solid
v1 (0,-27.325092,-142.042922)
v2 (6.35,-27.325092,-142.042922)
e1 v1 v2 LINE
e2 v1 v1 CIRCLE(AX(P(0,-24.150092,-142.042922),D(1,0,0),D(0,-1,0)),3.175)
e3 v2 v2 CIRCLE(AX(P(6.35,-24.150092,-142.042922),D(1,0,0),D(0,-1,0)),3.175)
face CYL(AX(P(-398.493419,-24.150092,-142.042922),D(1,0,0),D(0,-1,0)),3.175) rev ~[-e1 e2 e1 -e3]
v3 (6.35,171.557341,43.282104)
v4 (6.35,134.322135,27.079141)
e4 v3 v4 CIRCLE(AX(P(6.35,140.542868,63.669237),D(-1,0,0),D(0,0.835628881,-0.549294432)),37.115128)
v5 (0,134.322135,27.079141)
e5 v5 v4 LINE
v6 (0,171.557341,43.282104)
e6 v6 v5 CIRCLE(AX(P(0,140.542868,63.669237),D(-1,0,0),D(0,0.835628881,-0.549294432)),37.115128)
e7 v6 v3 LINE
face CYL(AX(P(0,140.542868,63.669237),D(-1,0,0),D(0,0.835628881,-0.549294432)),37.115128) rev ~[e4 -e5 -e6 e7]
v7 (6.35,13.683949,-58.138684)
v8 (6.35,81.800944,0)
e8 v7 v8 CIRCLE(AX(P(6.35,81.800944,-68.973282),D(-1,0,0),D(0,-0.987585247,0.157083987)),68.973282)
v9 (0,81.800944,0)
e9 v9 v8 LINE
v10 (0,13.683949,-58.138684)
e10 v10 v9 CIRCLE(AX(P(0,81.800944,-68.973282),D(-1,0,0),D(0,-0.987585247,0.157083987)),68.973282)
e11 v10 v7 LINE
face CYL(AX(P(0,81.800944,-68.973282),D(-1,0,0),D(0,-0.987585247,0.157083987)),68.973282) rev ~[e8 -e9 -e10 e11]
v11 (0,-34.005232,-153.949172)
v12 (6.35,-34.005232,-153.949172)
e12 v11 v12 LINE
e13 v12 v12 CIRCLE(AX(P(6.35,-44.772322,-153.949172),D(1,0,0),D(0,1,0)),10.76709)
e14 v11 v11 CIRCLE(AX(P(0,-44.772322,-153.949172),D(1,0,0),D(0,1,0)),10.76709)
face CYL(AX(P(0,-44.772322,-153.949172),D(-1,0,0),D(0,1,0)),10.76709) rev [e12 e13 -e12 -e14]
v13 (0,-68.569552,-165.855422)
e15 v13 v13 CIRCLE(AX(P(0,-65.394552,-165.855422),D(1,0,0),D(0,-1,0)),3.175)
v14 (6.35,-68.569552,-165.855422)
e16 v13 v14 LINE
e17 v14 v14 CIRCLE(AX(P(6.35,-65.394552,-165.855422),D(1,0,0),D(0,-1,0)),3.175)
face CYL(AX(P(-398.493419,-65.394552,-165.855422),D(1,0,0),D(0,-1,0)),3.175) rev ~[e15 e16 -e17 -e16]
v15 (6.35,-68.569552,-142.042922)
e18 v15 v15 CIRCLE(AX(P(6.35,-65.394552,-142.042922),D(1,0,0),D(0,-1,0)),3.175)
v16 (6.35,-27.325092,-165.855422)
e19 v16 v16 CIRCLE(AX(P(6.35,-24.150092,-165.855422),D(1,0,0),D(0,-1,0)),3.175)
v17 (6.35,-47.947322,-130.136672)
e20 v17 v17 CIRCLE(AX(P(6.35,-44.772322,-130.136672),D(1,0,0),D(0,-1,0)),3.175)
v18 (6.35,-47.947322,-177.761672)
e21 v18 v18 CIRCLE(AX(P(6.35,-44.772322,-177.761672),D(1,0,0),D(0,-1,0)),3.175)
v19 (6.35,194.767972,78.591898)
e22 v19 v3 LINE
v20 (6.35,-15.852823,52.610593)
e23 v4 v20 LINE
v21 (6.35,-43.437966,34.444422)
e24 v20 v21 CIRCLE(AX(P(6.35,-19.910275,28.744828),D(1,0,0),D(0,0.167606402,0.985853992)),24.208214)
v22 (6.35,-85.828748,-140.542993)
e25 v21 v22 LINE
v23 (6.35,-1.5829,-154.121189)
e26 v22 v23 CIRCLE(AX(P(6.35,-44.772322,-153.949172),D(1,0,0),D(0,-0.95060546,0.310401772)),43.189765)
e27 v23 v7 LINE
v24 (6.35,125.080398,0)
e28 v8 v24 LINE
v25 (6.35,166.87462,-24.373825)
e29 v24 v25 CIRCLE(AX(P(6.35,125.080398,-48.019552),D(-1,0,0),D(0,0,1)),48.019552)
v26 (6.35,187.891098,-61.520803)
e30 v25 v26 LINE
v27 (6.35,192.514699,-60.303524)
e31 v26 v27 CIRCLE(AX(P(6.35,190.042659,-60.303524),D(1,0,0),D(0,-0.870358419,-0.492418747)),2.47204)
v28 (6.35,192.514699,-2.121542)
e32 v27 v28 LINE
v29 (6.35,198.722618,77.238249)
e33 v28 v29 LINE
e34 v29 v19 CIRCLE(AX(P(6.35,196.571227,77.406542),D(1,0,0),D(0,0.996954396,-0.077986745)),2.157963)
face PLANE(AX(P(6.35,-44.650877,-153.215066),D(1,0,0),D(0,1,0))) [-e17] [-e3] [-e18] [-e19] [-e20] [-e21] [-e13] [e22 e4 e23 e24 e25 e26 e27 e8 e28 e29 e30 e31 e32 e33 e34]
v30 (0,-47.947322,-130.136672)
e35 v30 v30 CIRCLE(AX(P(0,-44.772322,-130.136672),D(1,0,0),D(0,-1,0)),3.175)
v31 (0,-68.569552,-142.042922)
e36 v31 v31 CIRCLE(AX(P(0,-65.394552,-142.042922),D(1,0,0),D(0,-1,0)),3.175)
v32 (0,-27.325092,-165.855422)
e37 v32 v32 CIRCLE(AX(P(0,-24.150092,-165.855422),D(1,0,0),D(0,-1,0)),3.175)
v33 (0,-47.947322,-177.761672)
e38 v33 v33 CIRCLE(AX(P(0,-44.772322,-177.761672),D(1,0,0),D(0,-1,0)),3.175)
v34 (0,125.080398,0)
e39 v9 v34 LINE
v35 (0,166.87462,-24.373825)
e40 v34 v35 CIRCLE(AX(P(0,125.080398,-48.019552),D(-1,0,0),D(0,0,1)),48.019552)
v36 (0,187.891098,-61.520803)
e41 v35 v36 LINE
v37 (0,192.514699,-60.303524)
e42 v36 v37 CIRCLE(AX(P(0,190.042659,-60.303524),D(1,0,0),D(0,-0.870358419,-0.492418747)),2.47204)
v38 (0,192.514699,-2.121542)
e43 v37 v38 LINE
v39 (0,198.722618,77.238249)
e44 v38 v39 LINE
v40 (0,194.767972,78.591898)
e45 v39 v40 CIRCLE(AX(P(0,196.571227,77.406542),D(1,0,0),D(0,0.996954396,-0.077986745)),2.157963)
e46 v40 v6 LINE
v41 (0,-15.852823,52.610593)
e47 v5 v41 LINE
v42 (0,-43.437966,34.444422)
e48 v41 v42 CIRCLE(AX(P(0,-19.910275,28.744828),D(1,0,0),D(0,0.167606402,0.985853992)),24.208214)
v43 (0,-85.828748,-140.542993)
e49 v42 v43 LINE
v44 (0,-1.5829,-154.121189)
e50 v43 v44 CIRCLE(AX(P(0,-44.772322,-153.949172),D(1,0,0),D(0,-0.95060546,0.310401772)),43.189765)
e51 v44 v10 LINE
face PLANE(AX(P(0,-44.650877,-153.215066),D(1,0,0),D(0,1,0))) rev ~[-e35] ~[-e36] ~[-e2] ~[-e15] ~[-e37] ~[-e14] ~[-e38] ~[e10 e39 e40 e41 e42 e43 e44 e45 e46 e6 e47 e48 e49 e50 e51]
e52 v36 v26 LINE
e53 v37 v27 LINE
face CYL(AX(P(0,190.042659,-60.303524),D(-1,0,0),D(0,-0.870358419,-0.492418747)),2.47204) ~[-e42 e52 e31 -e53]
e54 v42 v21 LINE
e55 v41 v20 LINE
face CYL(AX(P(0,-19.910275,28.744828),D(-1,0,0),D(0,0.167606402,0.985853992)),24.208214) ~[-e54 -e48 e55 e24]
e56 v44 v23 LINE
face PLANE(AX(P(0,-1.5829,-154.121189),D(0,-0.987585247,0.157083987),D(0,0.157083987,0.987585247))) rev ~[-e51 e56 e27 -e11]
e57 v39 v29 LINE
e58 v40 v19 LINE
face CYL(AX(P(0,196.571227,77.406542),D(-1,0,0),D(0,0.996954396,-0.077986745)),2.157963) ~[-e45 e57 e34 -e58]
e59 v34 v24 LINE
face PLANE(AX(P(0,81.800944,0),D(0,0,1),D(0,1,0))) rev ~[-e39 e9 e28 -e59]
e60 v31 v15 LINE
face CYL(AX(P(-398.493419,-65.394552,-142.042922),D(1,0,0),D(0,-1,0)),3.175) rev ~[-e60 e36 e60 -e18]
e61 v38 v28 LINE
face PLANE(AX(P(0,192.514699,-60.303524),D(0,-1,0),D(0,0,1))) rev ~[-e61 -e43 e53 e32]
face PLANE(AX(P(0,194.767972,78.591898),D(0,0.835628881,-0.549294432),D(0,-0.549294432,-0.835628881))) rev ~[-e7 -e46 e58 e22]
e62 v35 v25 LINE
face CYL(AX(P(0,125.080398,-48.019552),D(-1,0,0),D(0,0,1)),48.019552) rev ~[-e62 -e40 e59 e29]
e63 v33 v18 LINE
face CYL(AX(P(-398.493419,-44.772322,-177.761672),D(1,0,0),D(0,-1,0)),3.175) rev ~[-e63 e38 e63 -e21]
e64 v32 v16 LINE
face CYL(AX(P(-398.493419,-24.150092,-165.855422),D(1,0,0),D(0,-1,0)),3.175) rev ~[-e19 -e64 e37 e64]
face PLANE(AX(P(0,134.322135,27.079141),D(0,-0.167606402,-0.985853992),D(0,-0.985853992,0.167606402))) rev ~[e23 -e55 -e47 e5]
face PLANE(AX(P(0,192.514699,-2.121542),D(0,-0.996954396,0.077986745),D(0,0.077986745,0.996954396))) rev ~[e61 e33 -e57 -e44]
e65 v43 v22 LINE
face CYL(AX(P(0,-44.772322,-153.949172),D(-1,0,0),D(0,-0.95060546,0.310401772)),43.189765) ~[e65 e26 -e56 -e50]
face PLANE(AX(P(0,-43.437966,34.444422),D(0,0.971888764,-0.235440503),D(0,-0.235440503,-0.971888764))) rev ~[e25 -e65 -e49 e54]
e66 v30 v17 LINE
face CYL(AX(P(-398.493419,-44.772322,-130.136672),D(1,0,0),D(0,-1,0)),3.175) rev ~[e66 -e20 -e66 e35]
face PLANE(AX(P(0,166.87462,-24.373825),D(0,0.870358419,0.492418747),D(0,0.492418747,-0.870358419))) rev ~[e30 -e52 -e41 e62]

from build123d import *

# Parameters (mm, degrees)
F1_DEPTH = 6.35
F2_DEPTH = 6.35
F0_R     = 10.7670897693
F5_DEPTH = 6.35
F6_D     = 6.35


# Not quite as in the source:
# - a feature of the source that left no trace in its solid (it failed there, or was rolled back) is left out


with BuildPart() as f1:
    # F0 (on Right) → F1 (new body)
    with BuildSketch(Plane.YZ):
        with BuildLine():
            ThreePointArc((-1.5825573364, -153.9491721496), (-1.5826429755, -154.035180638), (-1.5828998925, -154.1211887854))
            Line((-1.5828998925, -154.1211887854), (13.683948877, -58.1386835494))
            ThreePointArc((13.683948877, -58.1386835494), (37.0236297514, -16.510860014), (81.800944289, 0))
            Line((81.800944289, 0), (125.0803981306, 0))
            ThreePointArc((125.0803981306, 0), (149.2715136598, -6.5386249673), (166.8746197449, -24.3738245223))
            Line((166.8746197449, -24.3738245223), (187.8910975974, -61.5208026845))
            ThreePointArc((187.8910975974, -61.5208026845), (190.6720383022, -62.6941019502), (192.5146989034, -60.3035237191))
            Line((192.5146989034, -60.3035237191), (192.5146989034, -2.1215420715))
            Line((192.5146989034, -2.1215420715), (198.7226175975, 77.2382490494))
            ThreePointArc((198.7226175975, 77.2382490494), (197.2700771229, 79.4482102797), (194.7679715475, 78.5918983278))
            Line((194.7679715475, 78.5918983278), (171.5573410493, 43.2821044094))
            ThreePointArc((171.5573410493, 43.2821044094), (155.3522029023, 29.6366600871), (134.3221352203, 27.0791405068))
            Line((134.3221352203, 27.0791405068), (-15.8528228172, 52.6105930486))
            ThreePointArc((-15.8528228172, 52.6105930486), (-33.2247403603, 48.9627075804), (-43.4379661828, 34.4444223576))
            Line((-43.4379661828, 34.4444223576), (-85.8287484087, -140.5429926023))
            ThreePointArc((-85.8287484087, -140.5429926023), (-37.9848929099, -111.2960762471), (-1.5825573364, -153.9491721496))
        make_face()
    extrude(amount=F1_DEPTH)

    # F0 (on Right) → F2 (join)
    with BuildSketch(Plane.YZ):
        with BuildLine():
            ThreePointArc((-1.5825573364, -153.9491721496), (-1.5826429755, -154.035180638), (-1.5828998925, -154.1211887854))
            Line((-1.5828998925, -154.1211887854), (13.683948877, -58.1386835494))
            ThreePointArc((13.683948877, -58.1386835494), (37.0236297514, -16.510860014), (81.800944289, 0))
            Line((81.800944289, 0), (125.0803981306, 0))
            ThreePointArc((125.0803981306, 0), (149.2715136598, -6.5386249673), (166.8746197449, -24.3738245223))
            Line((166.8746197449, -24.3738245223), (187.8910975974, -61.5208026845))
            ThreePointArc((187.8910975974, -61.5208026845), (190.6720383022, -62.6941019502), (192.5146989034, -60.3035237191))
            Line((192.5146989034, -60.3035237191), (192.5146989034, -2.1215420715))
            Line((192.5146989034, -2.1215420715), (198.7226175975, 77.2382490494))
            ThreePointArc((198.7226175975, 77.2382490494), (197.2700771229, 79.4482102797), (194.7679715475, 78.5918983278))
            Line((194.7679715475, 78.5918983278), (171.5573410493, 43.2821044094))
            ThreePointArc((171.5573410493, 43.2821044094), (155.3522029023, 29.6366600871), (134.3221352203, 27.0791405068))
            Line((134.3221352203, 27.0791405068), (-15.8528228172, 52.6105930486))
            ThreePointArc((-15.8528228172, 52.6105930486), (-33.2247403603, 48.9627075804), (-43.4379661828, 34.4444223576))
            Line((-43.4379661828, 34.4444223576), (-85.8287484087, -140.5429926023))
            ThreePointArc((-85.8287484087, -140.5429926023), (-37.9848929099, -111.2960762471), (-1.5825573364, -153.9491721496))
        make_face()
    extrude(amount=F2_DEPTH)

    # F0 (on Right) → F5 (join)
    with BuildSketch(Plane.YZ):
        with BuildLine():
            ThreePointArc((-85.8287484087, -140.5429926023), (-51.6446777228, -196.588666929), (-1.5828998925, -154.1211887854))
            ThreePointArc((-1.5828998925, -154.1211887854), (-1.5826429755, -154.035180638), (-1.5825573364, -153.9491721496))
            ThreePointArc((-1.5825573364, -153.9491721496), (-37.9848929099, -111.2960762471), (-85.8287484087, -140.5429926023))
        make_face()
        with Locations((-44.772322165, -153.9491721496)):
            Circle(F0_R, mode=Mode.SUBTRACT)
    extrude(amount=F5_DEPTH)

    # F6 (through all)
    with Locations(Plane(origin=(0, 0, 0), x_dir=(0, 1, 0), z_dir=(-1, 0, 0))):
        with Locations((-44.772322165, 130.1366721496), (-24.1500922374, 142.0429221496), (-24.1500922374, 165.8554221496), (-44.772322165, 177.7616721496), (-65.3945520927, 165.8554221496), (-65.3945520927, 142.0429221496)):
            Hole(F6_D / 2)


solid = f1.part
